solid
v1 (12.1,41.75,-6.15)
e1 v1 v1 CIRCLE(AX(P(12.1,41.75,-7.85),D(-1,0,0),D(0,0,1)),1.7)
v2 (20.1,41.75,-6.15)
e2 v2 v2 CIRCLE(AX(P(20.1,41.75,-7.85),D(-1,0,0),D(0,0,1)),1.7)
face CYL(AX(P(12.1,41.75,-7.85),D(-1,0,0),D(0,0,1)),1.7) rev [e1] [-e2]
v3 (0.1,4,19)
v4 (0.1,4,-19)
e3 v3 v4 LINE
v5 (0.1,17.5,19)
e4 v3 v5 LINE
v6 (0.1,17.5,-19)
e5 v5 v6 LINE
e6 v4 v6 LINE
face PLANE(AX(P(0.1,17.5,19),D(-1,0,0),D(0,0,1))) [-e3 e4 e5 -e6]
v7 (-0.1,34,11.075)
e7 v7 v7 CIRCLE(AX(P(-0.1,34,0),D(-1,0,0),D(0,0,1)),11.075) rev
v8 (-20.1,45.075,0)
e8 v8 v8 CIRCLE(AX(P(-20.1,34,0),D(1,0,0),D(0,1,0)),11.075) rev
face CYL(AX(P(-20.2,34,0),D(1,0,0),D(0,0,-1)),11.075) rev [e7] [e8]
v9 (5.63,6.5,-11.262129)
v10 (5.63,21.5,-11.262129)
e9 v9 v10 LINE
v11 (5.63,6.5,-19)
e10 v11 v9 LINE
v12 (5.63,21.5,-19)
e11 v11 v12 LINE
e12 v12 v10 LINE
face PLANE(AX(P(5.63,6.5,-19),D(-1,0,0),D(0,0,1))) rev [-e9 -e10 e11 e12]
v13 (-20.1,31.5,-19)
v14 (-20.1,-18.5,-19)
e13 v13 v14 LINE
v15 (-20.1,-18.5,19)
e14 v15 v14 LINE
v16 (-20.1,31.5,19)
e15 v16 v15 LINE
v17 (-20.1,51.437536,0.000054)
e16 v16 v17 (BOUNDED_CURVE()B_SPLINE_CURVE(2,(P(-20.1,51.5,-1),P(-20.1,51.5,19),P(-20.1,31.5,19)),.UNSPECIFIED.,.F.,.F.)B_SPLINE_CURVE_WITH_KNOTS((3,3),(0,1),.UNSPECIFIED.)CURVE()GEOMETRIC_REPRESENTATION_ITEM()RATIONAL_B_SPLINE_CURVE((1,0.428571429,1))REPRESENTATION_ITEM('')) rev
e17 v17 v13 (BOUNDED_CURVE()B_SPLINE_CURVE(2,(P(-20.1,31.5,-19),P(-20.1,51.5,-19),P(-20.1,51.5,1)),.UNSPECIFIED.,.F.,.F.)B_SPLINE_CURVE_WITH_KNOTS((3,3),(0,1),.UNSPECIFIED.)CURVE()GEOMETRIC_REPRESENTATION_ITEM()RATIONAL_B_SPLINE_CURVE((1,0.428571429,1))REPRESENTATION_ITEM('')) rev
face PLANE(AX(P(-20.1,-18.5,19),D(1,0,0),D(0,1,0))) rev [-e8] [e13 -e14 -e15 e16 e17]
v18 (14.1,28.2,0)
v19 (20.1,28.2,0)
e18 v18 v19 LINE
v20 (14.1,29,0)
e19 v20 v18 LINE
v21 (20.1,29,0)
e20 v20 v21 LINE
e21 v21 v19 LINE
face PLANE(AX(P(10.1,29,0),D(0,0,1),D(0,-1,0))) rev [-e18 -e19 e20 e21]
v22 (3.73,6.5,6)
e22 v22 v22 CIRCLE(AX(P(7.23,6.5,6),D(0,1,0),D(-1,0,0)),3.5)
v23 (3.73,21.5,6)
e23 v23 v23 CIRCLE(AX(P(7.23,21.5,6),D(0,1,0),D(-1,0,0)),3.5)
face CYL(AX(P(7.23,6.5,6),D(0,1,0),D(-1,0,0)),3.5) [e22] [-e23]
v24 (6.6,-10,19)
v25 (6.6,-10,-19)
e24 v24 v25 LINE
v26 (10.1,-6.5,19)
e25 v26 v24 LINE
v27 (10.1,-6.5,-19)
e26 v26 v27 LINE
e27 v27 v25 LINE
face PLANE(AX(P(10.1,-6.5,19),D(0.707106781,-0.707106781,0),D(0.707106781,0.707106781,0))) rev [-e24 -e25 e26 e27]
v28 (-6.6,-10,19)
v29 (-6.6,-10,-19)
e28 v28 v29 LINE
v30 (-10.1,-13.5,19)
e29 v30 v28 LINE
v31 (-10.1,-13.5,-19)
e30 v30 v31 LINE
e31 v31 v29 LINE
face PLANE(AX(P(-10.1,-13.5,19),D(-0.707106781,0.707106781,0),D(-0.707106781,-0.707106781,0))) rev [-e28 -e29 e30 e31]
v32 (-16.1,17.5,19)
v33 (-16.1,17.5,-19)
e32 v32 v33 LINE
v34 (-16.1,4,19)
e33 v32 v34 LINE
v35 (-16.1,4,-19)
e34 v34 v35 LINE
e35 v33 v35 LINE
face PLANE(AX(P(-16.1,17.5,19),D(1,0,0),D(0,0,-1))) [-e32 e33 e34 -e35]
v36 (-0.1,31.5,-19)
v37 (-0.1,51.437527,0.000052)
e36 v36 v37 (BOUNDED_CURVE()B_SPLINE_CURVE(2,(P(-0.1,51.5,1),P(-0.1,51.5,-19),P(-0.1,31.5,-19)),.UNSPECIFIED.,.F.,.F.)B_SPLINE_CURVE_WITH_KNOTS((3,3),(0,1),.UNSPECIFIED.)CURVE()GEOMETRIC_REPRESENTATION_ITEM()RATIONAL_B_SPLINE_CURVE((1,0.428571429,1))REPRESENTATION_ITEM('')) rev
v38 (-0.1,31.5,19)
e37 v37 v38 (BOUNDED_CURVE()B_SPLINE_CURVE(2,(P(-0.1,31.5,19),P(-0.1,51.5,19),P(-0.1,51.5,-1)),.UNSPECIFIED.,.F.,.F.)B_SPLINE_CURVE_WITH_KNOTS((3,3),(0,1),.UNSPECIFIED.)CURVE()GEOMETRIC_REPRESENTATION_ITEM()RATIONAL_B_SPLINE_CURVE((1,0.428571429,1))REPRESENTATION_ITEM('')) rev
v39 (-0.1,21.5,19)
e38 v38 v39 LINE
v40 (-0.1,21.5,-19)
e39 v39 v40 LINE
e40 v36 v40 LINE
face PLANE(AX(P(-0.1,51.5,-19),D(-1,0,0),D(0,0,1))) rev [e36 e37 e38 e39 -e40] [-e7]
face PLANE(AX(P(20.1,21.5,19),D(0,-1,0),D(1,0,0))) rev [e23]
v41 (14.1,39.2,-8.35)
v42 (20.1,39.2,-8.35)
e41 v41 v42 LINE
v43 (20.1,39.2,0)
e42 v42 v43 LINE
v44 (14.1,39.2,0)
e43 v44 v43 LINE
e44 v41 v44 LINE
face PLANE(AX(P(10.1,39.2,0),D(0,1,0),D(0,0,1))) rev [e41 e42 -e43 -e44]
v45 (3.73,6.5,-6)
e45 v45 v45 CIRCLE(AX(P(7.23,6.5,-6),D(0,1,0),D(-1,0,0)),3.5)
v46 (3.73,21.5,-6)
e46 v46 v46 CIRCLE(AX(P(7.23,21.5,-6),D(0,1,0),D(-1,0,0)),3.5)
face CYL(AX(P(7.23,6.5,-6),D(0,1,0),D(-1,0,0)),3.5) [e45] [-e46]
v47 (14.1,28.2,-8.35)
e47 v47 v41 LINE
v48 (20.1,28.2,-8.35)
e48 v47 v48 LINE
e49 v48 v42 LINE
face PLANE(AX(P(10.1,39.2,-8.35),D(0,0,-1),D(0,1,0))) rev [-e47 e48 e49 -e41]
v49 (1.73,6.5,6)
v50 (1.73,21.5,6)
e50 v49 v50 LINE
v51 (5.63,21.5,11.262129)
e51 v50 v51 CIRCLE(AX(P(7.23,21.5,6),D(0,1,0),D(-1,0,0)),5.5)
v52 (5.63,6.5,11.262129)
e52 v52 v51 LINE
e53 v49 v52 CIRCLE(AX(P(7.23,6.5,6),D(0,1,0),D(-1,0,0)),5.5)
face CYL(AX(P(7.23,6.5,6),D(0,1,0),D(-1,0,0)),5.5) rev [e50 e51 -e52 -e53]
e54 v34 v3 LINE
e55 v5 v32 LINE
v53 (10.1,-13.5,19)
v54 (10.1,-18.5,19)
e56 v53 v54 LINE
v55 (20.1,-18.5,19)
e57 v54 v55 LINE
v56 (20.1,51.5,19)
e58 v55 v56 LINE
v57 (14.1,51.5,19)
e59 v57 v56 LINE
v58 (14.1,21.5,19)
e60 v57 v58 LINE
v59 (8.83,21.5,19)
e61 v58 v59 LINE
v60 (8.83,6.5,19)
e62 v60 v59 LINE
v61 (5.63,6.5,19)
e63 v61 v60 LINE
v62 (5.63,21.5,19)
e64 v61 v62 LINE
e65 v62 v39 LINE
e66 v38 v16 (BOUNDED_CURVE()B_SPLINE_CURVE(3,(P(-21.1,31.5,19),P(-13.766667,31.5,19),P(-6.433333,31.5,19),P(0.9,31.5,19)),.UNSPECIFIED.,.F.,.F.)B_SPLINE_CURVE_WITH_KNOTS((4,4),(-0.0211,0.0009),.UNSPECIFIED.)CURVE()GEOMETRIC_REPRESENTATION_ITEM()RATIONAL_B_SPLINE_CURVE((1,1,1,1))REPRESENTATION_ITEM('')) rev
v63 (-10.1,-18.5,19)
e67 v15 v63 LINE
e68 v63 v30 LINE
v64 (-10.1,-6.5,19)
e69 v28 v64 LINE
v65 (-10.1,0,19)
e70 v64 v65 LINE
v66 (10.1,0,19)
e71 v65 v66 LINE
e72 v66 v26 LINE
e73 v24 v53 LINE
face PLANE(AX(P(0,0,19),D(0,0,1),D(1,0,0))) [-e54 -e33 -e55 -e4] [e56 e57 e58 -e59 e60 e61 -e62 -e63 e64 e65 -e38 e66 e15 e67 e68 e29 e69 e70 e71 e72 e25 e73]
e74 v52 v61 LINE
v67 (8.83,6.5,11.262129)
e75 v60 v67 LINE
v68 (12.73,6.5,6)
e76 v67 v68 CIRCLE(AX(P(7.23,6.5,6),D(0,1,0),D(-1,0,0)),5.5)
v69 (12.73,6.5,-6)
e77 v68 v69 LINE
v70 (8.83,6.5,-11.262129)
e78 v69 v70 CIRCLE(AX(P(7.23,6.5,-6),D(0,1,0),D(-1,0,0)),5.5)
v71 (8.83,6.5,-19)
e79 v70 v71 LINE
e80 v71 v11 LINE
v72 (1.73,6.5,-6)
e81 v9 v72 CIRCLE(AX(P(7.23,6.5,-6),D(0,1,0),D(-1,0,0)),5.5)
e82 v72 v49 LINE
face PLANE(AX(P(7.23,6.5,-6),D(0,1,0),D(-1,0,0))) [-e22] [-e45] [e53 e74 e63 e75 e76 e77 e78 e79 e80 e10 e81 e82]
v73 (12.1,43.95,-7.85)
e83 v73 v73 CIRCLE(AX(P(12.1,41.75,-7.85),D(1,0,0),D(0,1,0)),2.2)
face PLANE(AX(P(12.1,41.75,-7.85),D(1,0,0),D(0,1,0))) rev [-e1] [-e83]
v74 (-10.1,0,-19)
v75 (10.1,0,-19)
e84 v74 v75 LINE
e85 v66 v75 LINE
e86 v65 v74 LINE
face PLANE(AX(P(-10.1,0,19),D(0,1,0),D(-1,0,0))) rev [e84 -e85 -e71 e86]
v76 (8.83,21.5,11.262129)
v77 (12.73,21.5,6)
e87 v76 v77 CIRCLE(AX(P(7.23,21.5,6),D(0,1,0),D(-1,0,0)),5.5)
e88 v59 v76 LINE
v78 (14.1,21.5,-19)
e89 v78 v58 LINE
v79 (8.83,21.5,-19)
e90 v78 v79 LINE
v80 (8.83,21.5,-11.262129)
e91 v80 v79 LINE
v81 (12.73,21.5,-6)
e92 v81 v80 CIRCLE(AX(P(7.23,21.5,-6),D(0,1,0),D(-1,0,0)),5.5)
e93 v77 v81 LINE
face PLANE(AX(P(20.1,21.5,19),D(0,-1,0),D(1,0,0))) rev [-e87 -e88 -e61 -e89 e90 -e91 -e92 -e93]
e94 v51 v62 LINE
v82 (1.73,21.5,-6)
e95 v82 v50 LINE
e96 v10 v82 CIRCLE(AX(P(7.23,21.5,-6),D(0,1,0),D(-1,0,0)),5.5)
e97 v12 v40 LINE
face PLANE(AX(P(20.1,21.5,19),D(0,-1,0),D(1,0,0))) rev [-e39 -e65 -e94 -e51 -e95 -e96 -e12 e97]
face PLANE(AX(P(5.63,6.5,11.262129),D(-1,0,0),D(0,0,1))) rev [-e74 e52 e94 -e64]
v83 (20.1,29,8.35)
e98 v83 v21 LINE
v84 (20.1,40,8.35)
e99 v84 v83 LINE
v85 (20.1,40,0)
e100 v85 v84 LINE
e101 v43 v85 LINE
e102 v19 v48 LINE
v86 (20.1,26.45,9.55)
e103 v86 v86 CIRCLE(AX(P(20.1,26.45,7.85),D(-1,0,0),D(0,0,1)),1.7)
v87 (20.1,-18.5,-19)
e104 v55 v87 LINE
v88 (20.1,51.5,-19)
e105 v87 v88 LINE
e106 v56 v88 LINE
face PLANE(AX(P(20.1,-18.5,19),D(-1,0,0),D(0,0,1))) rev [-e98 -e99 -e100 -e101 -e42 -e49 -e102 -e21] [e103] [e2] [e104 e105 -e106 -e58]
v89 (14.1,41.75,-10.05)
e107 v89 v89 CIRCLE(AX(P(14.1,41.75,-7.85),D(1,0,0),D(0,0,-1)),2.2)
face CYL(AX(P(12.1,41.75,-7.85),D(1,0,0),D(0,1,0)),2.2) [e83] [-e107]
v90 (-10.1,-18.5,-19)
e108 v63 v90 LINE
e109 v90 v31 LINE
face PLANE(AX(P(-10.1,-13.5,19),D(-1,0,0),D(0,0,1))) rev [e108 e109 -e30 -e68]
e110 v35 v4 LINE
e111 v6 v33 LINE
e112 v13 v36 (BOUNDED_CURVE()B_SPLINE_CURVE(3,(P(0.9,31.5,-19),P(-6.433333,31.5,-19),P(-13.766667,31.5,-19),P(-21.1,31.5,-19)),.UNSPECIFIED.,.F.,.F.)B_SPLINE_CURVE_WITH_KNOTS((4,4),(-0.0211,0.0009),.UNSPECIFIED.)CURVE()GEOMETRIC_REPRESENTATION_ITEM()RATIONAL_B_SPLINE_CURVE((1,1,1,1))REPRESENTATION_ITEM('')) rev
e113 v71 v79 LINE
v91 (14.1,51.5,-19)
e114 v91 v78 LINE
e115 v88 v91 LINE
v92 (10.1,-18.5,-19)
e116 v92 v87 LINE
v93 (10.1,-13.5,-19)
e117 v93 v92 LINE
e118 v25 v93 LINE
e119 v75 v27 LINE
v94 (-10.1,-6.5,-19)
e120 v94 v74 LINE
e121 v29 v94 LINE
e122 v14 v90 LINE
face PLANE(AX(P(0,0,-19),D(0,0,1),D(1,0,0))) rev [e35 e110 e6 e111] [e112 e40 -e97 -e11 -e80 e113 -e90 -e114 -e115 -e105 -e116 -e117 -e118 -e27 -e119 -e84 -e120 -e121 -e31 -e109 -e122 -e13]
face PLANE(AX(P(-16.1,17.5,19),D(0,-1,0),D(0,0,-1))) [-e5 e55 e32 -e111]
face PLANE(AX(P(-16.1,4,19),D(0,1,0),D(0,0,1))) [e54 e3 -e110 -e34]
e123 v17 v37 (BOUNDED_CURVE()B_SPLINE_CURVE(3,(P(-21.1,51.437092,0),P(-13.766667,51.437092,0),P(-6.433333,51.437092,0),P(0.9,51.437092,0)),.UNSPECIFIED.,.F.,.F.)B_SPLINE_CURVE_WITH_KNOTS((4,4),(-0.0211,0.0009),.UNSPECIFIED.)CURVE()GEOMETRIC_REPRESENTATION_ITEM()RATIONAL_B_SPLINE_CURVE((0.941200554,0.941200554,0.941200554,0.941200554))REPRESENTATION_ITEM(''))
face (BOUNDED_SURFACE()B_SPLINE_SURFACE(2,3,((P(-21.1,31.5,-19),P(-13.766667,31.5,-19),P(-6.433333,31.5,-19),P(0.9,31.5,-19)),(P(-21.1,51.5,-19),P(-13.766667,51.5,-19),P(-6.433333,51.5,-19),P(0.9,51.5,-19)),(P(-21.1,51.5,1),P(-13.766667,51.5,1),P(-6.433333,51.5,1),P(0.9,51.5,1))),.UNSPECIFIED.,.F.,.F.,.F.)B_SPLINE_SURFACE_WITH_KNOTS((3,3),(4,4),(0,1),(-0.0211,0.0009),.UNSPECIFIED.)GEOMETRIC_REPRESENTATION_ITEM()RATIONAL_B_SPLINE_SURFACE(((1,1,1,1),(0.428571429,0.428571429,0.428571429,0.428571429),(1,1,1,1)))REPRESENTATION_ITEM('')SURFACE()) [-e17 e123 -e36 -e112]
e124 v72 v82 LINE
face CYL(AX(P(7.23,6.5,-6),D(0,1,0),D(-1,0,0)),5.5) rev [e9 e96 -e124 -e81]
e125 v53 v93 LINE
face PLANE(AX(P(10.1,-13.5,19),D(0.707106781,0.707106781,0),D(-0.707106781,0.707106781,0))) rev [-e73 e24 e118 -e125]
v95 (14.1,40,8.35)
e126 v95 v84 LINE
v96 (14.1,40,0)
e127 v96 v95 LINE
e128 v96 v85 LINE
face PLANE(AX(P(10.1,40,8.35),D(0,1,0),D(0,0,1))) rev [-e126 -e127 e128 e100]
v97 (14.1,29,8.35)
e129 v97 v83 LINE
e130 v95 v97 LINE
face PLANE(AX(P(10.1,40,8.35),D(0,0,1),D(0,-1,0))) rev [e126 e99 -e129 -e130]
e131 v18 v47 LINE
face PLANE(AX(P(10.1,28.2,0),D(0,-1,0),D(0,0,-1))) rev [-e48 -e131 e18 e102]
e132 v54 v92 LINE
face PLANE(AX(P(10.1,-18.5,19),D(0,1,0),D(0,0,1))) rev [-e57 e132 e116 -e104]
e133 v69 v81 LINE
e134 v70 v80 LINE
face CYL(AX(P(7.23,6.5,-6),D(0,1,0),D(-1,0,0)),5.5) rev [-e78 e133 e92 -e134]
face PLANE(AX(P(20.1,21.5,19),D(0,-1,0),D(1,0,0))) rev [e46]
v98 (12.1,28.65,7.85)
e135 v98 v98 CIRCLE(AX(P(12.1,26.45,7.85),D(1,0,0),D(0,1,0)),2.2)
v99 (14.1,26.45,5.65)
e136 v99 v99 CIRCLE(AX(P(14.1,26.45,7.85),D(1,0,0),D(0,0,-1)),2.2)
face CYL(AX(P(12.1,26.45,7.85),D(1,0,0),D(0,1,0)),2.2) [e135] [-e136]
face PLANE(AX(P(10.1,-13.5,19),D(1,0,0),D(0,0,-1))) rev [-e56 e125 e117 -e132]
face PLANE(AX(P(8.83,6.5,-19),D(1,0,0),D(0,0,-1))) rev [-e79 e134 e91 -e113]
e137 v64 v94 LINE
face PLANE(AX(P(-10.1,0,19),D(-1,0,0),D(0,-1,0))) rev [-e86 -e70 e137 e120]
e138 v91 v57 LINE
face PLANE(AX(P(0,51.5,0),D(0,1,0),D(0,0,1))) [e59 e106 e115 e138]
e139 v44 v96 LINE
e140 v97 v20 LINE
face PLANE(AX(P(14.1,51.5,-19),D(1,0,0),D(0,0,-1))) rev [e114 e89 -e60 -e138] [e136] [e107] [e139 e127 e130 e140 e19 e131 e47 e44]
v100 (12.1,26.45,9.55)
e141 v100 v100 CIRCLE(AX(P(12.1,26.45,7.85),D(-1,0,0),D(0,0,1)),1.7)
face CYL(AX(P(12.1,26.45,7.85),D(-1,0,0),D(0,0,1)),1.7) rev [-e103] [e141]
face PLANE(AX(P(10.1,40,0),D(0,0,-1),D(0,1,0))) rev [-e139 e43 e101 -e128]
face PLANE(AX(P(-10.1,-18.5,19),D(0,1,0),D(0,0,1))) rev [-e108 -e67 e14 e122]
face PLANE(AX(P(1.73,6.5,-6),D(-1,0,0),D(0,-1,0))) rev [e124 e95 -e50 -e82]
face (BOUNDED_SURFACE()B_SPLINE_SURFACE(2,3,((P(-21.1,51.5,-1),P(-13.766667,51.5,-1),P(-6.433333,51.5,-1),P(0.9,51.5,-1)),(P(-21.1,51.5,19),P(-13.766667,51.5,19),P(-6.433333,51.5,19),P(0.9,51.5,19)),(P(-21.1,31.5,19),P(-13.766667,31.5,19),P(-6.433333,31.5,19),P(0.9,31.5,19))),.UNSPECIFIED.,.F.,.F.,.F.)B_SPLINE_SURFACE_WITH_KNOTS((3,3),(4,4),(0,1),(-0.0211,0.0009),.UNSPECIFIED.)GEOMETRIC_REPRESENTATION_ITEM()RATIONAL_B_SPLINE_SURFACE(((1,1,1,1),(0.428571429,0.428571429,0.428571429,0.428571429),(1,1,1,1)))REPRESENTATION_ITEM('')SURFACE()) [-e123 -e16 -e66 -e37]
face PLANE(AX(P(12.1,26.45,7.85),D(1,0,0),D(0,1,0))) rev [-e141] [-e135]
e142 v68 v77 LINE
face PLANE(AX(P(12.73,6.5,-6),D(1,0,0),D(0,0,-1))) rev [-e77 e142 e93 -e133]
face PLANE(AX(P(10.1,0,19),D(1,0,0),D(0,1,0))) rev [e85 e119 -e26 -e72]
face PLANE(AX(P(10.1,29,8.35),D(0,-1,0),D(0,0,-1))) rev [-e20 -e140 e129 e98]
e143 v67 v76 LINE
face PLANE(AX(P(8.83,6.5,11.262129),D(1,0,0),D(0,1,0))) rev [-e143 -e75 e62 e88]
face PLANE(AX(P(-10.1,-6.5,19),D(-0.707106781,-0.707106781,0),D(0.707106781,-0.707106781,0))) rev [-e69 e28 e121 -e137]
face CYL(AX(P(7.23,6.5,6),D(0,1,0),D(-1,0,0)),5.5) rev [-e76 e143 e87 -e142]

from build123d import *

# Parameters (mm, degrees)
SKETCH1_W                = 16.2
SKETCH1_H                = 13.5
BOSS_EXTRUDE1_DEPTH      = 19
SKETCH2_W                = 20
SKETCH2_H                = 38
BOSS_EXTRUDE2_DEPTH      = 30
FILLET2_SIZE             = 20
SKETCH7_W                = 6
SKETCH7_H                = 38
BOSS_EXTRUDE6_DEPTH      = 30
CUT_EXTRUDE1_DEPTH       = 69.038885968
CUT_EXTRUDE1_DEPTH_BACK  = 31
SKETCH3_R                = 11.075
SKETCH5_W                = 2.5
SKETCH5_H                = 38
BOSS_EXTRUDE3_DEPTH      = 30
SKETCH11_R               = 3.5
CUT_EXTRUDE5_DEPTH       = 15
SKETCH9_R                = 2.2
BOSS_EXTRUDE7_DEPTH      = 8
M3_CLEARANCE_HOLE3_D     = 3.4
M3_CLEARANCE_HOLE3_DEPTH = 8
CUT_EXTRUDE6_DEPTH       = 10


with BuildPart() as part:
    # Sketch1 → Boss-Extrude1 (new, symmetric)
    with BuildSketch(Plane.XY):
        Polygon((-10.1, 0), (10.1, 0), (10.1, -6.5), (6.6, -10), (10.1, -13.5), (10.1, -18.5), (20.1, -18.5), (20.1, 21.5), (-20.1, 21.5), (-20.1, -18.5), (-10.1, -18.5), (-10.1, -13.5), (-6.6, -10), (-10.1, -6.5), align=None)
        with Locations((-8, 10.75)):
            Rectangle(SKETCH1_W, SKETCH1_H, mode=Mode.SUBTRACT)
    extrude(amount=BOSS_EXTRUDE1_DEPTH, both=True)

    # Sketch2 → Boss-Extrude2 (add)
    with BuildSketch(Plane(origin=(0, 21.5, 0), x_dir=(1, 0, 0), z_dir=(0, 1, 0))):
        with Locations((-10.1, 0)):
            Rectangle(SKETCH2_W, SKETCH2_H)
    extrude(amount=BOSS_EXTRUDE2_DEPTH)

    # Fillet2
    # a fillet whose section is not a circle: 20 mm, written as the material it takes off along each edge
    with BuildSketch(Plane(origin=(-70.1, 51.5, -19), x_dir=(0, 0, 1), z_dir=(1, 0, 0)), Plane(origin=(49.9, 51.5, 19), x_dir=(0, 0, -1), z_dir=(-1, 0, 0))) as fillet2_piece_1:
        with BuildLine():
            Bezier((FILLET2_SIZE, 0), (0, 0), (0, FILLET2_SIZE), weights=[1, 0.428571429, 1])
            Line((0, FILLET2_SIZE), (0, 0))
            Line((0, 0), (FILLET2_SIZE, 0))
        make_face()
    extrude(amount=120, mode=Mode.SUBTRACT)

    # Sketch7 → Boss-Extrude6 (add)
    with BuildSketch(Plane(origin=(0, 21.5, 0), x_dir=(1, 0, 0), z_dir=(0, 1, 0))):
        with Locations((17.1, 0)):
            Rectangle(SKETCH7_W, SKETCH7_H)
    extrude(amount=BOSS_EXTRUDE6_DEPTH)

    # Sketch3 → Cut-Extrude1 (cut, two sides: drawn at the far end of the back side and taken through both)
    with BuildSketch(Plane.ZY.offset(20.1).offset(-CUT_EXTRUDE1_DEPTH_BACK)):
        with Locations(Location((0, 34, 0), (0, 0, 90))):
            Circle(SKETCH3_R)
    extrude(amount=CUT_EXTRUDE1_DEPTH + CUT_EXTRUDE1_DEPTH_BACK, mode=Mode.SUBTRACT)

    # Sketch5 → Boss-Extrude3 (add)
    with BuildSketch(Plane(origin=(0, 21.5, 0), x_dir=(1, 0, 0), z_dir=(0, 1, 0))):
        with Locations((18.85, 0)):
            Rectangle(SKETCH5_W, SKETCH5_H)
    extrude(amount=BOSS_EXTRUDE3_DEPTH)

    # Sketch11 → Cut-Extrude5 (cut)
    with BuildSketch(Plane(origin=(0, 21.5, 0), x_dir=(1, 0, 0), z_dir=(0, 1, 0))):
        with BuildLine():
            Line((5.63, -11.262128847), (5.63, -19))
            Line((5.63, -19), (8.83, -19))
            Line((8.83, -19), (8.83, -11.262128847))
            ThreePointArc((8.83, -11.262128847), (11.648710219, -9.274904579), (12.73, -6))
            Line((12.73, -6), (12.73, 6))
            ThreePointArc((12.73, 6), (11.648710219, 9.274904579), (8.83, 11.262128847))
            Line((8.83, 11.262128847), (8.83, 19))
            Line((8.83, 19), (5.63, 19))
            Line((5.63, 19), (5.63, 11.262128847))
            ThreePointArc((5.63, 11.262128847), (2.811289781, 9.274904579), (1.73, 6))
            Line((1.73, 6), (1.73, -6))
            ThreePointArc((1.73, -6), (2.811289781, -9.274904579), (5.63, -11.262128847))
        make_face()
        with Locations(Location((7.23, 6, 0), (0, 0, 180))):
            Circle(SKETCH11_R, mode=Mode.SUBTRACT)
        with Locations(Location((7.23, -6, 0), (0, 0, 180))):
            Circle(SKETCH11_R, mode=Mode.SUBTRACT)
    extrude(amount=-CUT_EXTRUDE5_DEPTH, mode=Mode.SUBTRACT)

    # Sketch9 → Boss-Extrude7 (add)
    with BuildSketch(Plane(origin=(20.1, 0, 0), x_dir=(0, 0, -1), z_dir=(1, 0, 0))):
        with Locations(Location((7.85, 41.75, 0), (0, 0, 90))):
            Circle(SKETCH9_R)
        with Locations(Location((-7.85, 26.45, 0), (0, 0, 90))):
            Circle(SKETCH9_R)
    extrude(amount=-BOSS_EXTRUDE7_DEPTH)

    # M3 Clearance Hole3
    with Locations(Plane(origin=(12.1, 41.75, -7.85), x_dir=(0, -1, 0), z_dir=(-1, 0, 0))):
        with Locations((0, 0), (15.3, 15.7)):
            Hole(M3_CLEARANCE_HOLE3_D / 2, depth=M3_CLEARANCE_HOLE3_DEPTH)

    # Sketch19 → Cut-Extrude6 (cut)
    with BuildSketch(Plane(origin=(20.1, 0, 0), x_dir=(0, 0, -1), z_dir=(1, 0, 0))):
        Polygon((0, 39.2), (8.35, 39.2), (8.35, 28.2), (0, 28.2), (0, 29), (-8.35, 29), (-8.35, 40), (0, 40), align=None)
    extrude(amount=-CUT_EXTRUDE6_DEPTH, mode=Mode.SUBTRACT)


solid = part.part
